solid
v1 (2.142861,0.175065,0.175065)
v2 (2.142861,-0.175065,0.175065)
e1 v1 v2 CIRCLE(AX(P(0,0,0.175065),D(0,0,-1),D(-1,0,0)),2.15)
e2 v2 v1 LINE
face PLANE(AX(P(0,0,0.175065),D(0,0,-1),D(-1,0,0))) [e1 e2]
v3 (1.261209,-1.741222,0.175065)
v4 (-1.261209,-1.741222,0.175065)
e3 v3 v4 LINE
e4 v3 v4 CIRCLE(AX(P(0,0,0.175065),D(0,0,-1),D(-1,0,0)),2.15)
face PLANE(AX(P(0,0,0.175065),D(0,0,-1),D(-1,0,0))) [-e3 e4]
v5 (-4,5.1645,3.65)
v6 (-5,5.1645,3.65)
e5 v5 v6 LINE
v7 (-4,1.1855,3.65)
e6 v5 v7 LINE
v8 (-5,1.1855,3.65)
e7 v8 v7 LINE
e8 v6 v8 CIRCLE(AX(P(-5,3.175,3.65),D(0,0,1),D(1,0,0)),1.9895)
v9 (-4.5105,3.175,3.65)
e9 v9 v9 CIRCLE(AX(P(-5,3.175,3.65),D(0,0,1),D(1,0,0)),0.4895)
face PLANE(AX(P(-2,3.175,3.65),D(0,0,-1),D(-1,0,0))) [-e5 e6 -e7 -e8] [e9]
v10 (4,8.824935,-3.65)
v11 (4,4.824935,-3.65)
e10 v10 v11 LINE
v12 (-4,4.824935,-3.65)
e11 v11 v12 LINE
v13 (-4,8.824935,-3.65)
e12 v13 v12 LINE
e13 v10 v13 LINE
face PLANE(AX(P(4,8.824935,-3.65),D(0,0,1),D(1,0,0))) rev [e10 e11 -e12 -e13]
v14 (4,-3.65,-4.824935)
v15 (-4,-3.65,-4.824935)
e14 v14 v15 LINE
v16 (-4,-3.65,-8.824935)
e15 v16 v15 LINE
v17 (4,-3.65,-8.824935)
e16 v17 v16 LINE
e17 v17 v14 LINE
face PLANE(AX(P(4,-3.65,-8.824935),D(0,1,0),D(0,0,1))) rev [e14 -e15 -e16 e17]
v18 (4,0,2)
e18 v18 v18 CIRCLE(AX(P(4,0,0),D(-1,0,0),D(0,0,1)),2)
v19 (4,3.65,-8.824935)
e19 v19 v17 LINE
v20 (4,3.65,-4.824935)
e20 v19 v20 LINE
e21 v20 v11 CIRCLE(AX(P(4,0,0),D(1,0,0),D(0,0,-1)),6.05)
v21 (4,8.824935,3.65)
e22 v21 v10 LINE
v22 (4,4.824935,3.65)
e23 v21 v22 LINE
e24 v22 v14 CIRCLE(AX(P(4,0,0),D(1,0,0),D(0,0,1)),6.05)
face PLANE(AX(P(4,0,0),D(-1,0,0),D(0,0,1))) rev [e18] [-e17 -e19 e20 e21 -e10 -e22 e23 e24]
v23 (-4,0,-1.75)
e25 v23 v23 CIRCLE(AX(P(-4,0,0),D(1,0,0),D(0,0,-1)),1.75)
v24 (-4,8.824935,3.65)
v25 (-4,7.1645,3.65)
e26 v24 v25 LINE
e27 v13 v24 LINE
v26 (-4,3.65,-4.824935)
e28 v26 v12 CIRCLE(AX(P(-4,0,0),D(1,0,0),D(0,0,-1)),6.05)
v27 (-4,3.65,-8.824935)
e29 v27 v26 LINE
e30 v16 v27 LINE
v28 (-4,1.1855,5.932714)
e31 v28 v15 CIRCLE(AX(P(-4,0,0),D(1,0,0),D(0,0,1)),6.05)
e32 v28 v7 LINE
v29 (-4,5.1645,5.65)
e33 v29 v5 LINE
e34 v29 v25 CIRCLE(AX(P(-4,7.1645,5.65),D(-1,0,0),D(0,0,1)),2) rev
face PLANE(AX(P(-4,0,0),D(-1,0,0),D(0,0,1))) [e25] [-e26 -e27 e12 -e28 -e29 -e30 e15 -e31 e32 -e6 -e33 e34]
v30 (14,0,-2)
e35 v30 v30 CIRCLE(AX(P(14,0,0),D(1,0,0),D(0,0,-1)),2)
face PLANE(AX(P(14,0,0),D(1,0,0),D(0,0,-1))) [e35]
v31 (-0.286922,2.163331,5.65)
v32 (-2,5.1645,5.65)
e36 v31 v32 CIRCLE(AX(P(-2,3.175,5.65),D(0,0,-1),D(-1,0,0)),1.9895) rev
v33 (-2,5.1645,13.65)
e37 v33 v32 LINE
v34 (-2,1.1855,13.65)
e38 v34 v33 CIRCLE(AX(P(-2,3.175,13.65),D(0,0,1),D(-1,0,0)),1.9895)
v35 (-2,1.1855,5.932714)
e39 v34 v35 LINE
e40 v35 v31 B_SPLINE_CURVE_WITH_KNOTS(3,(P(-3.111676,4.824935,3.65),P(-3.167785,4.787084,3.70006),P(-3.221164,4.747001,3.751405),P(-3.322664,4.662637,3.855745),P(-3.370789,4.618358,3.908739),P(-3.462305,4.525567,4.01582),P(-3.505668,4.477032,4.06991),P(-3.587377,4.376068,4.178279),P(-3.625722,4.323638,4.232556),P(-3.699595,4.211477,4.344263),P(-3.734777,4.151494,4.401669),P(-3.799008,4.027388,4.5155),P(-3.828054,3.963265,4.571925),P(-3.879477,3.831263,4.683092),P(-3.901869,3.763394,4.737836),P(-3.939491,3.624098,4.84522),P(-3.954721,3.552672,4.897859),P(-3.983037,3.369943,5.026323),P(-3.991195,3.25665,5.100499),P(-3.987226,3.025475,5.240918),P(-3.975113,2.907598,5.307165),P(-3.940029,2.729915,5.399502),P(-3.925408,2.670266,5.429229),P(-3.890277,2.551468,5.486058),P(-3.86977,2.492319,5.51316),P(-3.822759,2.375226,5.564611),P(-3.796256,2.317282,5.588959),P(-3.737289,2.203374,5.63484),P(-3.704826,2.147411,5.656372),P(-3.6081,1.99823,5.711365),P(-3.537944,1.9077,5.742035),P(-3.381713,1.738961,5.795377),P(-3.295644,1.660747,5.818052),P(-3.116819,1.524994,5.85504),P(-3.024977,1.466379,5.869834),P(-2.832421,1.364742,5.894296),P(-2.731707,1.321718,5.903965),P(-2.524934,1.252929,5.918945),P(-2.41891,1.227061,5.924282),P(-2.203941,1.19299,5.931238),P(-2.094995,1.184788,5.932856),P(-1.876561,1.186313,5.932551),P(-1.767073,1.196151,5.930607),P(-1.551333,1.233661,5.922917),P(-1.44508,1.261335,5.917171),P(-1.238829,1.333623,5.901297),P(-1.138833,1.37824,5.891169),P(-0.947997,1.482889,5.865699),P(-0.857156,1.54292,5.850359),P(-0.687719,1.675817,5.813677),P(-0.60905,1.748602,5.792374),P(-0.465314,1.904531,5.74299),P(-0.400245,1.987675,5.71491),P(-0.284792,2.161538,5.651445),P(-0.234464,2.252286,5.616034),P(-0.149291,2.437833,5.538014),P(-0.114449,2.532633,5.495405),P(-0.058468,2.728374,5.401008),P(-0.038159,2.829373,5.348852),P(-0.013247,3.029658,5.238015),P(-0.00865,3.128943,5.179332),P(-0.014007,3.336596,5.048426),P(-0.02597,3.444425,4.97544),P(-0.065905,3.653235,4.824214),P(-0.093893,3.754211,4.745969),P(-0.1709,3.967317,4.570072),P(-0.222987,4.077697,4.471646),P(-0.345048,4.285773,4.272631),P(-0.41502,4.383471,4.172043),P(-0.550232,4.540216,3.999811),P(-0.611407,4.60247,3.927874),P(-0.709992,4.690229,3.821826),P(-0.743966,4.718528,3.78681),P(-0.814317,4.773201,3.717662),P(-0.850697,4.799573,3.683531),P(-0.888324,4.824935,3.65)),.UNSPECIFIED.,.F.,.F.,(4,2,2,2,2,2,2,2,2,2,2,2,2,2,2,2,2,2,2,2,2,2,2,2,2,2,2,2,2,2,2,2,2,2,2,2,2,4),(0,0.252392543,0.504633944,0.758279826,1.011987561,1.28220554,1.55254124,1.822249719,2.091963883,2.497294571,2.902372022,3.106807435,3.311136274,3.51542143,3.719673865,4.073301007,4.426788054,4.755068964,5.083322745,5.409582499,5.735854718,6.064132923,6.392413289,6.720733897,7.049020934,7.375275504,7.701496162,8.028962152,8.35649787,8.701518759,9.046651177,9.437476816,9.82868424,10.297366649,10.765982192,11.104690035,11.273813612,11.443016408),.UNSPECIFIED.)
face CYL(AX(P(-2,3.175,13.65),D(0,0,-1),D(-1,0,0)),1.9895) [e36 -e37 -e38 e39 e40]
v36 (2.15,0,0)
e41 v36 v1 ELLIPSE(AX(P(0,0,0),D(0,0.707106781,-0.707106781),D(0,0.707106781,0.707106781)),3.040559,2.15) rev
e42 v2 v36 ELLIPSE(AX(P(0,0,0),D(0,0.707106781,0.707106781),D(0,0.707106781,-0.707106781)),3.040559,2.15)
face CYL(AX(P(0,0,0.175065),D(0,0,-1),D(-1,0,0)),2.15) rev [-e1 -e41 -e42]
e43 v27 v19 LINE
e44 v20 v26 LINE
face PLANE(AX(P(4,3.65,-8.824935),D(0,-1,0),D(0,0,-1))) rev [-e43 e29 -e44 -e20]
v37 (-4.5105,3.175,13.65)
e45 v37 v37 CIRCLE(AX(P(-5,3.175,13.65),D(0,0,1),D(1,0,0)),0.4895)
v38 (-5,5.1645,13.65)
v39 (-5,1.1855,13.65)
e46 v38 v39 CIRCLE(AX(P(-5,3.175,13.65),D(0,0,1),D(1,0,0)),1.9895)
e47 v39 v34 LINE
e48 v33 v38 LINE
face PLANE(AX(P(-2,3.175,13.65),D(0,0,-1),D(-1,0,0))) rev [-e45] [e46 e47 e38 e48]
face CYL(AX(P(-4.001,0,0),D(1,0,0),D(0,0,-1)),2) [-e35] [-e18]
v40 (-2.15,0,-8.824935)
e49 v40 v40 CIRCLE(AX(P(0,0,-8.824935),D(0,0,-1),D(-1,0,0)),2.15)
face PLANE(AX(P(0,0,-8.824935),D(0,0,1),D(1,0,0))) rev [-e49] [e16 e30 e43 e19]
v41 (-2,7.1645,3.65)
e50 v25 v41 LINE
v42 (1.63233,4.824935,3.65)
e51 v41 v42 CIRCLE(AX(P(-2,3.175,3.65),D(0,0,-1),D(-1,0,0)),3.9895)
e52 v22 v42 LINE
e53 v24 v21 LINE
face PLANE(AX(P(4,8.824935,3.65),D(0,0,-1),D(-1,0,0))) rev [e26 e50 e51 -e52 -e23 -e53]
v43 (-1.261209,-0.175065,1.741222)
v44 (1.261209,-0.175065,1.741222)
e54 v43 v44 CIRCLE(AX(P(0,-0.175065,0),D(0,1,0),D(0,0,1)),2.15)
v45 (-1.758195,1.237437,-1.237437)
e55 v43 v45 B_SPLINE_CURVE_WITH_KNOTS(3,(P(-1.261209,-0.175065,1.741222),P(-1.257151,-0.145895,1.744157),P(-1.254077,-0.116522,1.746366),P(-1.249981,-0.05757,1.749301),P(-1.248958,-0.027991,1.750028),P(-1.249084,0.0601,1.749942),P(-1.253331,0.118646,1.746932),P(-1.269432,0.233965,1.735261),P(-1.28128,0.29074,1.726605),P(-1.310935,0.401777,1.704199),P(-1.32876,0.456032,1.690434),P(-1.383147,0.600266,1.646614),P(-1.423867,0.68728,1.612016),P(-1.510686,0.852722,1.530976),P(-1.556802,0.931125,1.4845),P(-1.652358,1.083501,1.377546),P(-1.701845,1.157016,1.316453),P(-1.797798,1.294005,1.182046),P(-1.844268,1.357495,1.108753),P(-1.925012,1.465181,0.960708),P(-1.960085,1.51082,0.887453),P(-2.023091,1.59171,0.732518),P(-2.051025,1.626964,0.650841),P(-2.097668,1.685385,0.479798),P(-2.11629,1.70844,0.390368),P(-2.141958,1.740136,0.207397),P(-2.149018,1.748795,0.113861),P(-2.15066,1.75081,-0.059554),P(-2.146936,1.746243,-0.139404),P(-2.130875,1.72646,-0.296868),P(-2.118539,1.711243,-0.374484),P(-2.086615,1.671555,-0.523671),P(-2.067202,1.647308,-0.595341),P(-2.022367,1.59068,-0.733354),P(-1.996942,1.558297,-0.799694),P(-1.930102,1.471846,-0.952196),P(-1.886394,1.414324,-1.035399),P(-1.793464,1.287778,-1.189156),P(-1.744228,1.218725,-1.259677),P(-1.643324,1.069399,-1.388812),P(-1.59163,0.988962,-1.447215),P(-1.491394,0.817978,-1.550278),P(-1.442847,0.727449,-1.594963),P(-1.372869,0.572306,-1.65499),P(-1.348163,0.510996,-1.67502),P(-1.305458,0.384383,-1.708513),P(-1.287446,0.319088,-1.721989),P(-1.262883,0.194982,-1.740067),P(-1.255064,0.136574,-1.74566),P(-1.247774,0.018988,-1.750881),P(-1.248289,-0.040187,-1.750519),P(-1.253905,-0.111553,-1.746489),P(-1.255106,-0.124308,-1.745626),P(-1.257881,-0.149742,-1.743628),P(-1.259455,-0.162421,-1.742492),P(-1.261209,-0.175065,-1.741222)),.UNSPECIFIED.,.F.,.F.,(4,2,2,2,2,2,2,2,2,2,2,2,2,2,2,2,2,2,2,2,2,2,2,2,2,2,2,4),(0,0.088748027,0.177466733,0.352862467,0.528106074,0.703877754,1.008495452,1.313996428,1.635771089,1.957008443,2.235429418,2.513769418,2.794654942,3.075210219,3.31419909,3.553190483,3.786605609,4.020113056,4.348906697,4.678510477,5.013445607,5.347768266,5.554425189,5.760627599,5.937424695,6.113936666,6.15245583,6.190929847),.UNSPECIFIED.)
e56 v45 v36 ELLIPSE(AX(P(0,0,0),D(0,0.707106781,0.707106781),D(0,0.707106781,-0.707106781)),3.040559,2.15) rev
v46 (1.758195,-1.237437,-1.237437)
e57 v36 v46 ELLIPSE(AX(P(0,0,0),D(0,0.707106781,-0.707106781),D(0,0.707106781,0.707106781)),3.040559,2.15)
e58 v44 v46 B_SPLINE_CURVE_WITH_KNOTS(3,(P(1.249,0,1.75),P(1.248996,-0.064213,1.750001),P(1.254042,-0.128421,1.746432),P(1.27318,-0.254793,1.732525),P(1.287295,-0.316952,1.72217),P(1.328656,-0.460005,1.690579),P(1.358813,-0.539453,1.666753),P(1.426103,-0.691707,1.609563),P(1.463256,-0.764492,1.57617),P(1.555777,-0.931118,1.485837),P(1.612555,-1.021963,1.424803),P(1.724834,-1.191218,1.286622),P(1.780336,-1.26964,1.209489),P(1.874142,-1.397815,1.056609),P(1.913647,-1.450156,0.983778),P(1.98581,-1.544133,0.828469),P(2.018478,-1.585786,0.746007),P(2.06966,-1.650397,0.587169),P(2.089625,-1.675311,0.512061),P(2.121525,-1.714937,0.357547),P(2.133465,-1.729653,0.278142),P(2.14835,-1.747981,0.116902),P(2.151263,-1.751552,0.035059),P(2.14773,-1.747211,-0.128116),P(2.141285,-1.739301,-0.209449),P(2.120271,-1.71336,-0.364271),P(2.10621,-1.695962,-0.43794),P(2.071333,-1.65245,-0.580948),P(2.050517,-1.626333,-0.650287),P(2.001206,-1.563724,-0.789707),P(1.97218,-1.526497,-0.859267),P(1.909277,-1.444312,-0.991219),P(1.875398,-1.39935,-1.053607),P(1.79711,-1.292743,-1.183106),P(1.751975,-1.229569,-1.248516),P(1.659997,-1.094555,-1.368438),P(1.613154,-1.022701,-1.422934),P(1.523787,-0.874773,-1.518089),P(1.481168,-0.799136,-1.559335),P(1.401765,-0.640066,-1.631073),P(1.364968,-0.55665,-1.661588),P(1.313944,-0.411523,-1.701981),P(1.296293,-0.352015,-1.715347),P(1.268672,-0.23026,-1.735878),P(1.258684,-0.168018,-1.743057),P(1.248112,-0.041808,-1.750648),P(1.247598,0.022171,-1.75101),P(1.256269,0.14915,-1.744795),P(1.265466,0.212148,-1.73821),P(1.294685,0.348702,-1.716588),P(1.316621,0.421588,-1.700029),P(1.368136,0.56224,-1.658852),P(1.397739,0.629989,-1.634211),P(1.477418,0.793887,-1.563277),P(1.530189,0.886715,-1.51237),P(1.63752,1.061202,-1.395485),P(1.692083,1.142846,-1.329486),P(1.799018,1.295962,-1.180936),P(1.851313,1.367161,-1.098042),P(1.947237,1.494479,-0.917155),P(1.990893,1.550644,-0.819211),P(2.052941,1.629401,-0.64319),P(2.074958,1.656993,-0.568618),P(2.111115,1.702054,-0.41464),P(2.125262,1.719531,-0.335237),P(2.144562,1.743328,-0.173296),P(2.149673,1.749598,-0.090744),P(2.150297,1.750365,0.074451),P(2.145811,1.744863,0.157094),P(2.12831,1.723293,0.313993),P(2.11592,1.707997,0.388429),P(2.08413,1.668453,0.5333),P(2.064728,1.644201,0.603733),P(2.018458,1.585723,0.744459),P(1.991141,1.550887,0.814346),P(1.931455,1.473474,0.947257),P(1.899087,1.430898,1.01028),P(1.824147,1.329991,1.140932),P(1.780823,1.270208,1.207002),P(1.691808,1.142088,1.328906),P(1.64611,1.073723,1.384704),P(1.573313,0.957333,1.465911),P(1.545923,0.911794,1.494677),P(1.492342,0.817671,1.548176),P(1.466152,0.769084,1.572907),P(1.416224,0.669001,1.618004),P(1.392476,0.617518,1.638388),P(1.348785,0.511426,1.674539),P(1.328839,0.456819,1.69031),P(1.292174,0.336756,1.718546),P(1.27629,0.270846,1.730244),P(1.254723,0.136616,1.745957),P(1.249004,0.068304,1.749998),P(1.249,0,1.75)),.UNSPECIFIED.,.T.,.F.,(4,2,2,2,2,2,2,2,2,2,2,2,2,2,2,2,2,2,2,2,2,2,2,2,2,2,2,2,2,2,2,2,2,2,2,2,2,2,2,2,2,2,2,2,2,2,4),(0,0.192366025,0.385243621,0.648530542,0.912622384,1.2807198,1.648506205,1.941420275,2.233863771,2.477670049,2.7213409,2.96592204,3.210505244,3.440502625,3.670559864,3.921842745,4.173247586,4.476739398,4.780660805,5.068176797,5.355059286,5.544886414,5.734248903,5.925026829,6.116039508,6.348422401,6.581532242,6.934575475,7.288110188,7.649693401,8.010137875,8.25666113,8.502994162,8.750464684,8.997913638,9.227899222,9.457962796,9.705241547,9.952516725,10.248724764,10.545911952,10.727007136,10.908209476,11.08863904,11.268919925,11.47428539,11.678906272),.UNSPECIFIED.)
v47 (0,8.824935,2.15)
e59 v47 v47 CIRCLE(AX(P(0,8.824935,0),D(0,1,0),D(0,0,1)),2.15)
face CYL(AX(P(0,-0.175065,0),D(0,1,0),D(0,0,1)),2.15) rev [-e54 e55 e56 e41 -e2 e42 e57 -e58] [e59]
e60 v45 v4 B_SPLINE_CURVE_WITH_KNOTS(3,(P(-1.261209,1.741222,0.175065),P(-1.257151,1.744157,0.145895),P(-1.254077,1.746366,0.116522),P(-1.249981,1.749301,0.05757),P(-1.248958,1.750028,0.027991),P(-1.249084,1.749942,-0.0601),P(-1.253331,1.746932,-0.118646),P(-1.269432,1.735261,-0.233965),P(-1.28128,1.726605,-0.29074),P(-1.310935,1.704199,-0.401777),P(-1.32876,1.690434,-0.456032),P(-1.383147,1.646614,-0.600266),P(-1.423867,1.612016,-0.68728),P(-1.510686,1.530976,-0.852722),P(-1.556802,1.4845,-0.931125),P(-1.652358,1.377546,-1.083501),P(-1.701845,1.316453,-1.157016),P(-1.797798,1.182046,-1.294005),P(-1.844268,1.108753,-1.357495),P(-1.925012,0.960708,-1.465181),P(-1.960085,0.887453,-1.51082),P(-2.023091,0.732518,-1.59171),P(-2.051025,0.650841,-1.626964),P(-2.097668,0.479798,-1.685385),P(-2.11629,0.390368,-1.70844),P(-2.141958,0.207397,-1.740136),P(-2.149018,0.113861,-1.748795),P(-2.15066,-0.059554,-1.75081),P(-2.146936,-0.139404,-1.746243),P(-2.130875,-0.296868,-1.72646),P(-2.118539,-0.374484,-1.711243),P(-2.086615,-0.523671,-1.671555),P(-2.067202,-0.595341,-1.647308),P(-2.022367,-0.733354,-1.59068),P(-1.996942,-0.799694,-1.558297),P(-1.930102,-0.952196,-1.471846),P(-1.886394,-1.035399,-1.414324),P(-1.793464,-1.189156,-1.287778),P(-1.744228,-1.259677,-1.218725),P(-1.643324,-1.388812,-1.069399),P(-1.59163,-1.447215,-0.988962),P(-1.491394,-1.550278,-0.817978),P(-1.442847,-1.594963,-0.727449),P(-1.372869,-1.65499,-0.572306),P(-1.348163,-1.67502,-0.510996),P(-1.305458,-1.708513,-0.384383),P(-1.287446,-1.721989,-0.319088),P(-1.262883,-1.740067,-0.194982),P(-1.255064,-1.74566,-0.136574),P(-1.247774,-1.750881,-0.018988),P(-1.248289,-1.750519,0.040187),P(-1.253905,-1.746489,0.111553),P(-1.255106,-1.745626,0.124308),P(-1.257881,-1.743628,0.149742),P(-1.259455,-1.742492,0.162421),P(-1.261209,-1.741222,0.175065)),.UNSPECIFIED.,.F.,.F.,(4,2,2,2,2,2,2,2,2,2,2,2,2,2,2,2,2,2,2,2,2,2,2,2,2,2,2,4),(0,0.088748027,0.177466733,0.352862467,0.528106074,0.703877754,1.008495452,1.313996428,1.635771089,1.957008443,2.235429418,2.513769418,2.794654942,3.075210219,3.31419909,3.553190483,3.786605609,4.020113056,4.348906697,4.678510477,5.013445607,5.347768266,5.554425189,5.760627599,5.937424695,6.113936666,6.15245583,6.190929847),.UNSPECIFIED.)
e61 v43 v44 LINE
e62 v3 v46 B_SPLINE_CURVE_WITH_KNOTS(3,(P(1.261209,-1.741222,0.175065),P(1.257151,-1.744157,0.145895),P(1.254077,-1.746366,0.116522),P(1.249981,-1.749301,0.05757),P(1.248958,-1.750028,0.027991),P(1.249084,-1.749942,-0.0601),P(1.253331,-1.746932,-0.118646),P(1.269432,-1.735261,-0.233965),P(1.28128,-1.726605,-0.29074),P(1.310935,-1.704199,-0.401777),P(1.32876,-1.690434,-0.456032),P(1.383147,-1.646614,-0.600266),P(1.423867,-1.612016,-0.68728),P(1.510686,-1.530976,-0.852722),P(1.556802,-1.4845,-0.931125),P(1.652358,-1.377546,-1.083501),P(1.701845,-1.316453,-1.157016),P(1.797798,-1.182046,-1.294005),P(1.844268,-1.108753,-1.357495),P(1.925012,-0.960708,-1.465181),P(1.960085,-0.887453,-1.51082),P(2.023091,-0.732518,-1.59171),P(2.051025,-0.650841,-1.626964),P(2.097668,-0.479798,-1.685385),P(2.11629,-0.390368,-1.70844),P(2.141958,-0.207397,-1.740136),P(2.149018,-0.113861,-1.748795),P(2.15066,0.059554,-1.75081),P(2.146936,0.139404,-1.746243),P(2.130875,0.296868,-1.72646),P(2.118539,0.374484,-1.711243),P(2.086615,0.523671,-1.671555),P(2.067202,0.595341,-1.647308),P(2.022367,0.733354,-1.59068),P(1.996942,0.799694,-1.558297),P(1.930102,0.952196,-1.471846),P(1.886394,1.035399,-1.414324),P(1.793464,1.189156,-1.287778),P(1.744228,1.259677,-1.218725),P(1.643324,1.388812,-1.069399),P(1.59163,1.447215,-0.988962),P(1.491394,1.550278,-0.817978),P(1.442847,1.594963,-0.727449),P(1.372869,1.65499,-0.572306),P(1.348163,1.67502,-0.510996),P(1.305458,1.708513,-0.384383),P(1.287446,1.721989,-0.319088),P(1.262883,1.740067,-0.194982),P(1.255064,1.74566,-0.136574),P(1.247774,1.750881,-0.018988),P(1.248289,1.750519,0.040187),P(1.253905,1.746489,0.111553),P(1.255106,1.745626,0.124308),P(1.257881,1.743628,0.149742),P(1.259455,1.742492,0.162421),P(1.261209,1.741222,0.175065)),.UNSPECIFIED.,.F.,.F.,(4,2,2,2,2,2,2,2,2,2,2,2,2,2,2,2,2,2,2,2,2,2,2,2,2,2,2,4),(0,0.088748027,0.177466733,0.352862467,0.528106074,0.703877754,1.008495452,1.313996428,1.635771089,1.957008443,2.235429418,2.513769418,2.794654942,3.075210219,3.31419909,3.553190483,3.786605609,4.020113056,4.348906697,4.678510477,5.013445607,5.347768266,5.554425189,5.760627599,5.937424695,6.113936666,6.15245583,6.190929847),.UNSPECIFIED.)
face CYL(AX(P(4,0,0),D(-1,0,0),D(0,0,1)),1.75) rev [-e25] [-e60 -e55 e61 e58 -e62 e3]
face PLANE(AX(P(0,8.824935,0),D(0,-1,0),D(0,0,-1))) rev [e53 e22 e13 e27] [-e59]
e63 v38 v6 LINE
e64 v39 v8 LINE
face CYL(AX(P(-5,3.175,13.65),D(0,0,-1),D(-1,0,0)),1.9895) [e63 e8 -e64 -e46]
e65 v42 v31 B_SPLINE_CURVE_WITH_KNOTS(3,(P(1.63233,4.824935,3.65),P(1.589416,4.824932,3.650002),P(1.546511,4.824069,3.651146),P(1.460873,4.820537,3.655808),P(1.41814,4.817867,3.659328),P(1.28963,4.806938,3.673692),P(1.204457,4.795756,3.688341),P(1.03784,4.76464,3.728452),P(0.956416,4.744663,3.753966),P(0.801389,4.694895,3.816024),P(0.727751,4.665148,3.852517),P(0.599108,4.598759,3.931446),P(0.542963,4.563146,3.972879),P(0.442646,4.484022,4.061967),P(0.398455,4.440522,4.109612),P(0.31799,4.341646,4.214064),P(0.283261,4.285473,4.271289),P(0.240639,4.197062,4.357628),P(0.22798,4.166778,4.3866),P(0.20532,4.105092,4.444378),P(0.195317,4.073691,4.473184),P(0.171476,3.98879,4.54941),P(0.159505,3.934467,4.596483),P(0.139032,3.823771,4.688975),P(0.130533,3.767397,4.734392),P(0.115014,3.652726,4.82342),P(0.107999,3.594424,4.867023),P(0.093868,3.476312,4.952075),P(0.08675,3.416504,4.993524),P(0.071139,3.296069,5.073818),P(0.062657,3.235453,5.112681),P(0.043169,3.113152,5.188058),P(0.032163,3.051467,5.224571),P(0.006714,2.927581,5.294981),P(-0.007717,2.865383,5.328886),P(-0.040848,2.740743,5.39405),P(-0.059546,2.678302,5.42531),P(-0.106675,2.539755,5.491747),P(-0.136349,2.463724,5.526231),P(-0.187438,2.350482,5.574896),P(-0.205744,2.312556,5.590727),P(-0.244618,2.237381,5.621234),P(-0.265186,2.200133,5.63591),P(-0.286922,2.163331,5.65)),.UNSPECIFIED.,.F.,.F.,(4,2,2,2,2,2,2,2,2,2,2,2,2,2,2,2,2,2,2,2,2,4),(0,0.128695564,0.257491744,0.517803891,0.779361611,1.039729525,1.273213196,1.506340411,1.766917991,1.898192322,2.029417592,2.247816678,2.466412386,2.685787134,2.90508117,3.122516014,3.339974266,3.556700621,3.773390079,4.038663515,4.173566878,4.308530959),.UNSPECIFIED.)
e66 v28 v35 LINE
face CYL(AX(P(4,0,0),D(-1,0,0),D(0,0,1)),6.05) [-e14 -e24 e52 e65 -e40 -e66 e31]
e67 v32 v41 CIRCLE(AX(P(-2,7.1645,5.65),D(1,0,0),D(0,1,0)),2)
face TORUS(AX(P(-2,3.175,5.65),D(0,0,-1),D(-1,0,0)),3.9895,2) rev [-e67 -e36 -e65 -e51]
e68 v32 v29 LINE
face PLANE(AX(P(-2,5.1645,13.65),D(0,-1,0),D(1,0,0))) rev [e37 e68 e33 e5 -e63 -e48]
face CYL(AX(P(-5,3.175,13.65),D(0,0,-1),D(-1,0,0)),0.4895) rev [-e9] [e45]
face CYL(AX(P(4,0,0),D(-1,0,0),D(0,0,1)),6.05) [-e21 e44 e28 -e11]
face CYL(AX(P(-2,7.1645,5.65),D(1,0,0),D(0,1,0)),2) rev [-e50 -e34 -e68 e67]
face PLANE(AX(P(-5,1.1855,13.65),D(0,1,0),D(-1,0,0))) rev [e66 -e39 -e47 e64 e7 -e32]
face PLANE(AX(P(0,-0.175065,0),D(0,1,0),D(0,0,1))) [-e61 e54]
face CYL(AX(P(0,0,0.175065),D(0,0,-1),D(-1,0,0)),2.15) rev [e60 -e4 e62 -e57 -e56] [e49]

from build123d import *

# Parameters (mm, degrees)
SKETCH1_R               = 1.75
BOSS_EXTRUDE1_DEPTH     = 4
SKETCH2_R               = 2.15
CUT_EXTRUDE1_DEPTH      = 5
BOSS_EXTRUDE5_START     = -1.8499999
BOSS_EXTRUDE5_OUTLINE_R = 2
BOSS_EXTRUDE5_DEPTH     = 11.8499999
BOSS_EXTRUDE5_START_2   = -3
BOSS_EXTRUDE5_2_DEPTH   = 7.824935333
SKETCH3_R               = 2.15
CUT_EXTRUDE2_DEPTH      = 5
BOSS_EXTRUDE2_START     = 4
SKETCH4_W               = 8
SKETCH4_H               = 7.3
SKETCH4_R               = 2.15
BOSS_EXTRUDE2_DEPTH     = 4
BOSS_EXTRUDE3_START     = 4
SKETCH5_W               = 8
SKETCH5_H               = 7.3
SKETCH5_R               = 2.15
BOSS_EXTRUDE3_DEPTH     = 4
SKETCH6_R               = 0.4895
BOSS_EXTRUDE4_DEPTH     = 10
FILLET1_R               = 2


with BuildPart() as part:
    # Sketch1 → Boss-Extrude1 (new, symmetric)
    with BuildSketch(Plane(origin=(0, 0, 0), x_dir=(0, 0, -1), z_dir=(1, 0, 0))):
        with BuildLine():
            Line((-3.65, 4.824935233), (3.65, 4.824935233))
            ThreePointArc((3.65, 4.824935233), (4.277996026, 4.277996026), (4.824935233, 3.65))
            Line((4.824935233, 3.65), (4.824935233, -3.65))
            ThreePointArc((4.824935233, -3.65), (-4.277996026, -4.277996026), (-3.65, 4.824935233))
        make_face()
        Circle(SKETCH1_R, mode=Mode.SUBTRACT)
    extrude(amount=BOSS_EXTRUDE1_DEPTH, both=True)

    # Sketch2 → Cut-Extrude1 (cut)
    with BuildSketch(Plane(origin=(0, 4.824935233, 0), x_dir=(1, 0, 0), z_dir=(0, 1, 0))):
        with Locations(Location((0, 0, 0), (0, 0, 270))):
            Circle(SKETCH2_R)
    extrude(amount=-CUT_EXTRUDE1_DEPTH, mode=Mode.SUBTRACT)

    # Boss-Extrude5: read off the stored shape, not the designer's step
    # Boss-Extrude5 outline → Boss-Extrude5 (add)
    with BuildSketch(Plane(origin=(4, 0, 0), x_dir=(0, 0, -1), z_dir=(1, 0, 0)).offset(BOSS_EXTRUDE5_START)):
        Circle(BOSS_EXTRUDE5_OUTLINE_R)
    extrude(amount=BOSS_EXTRUDE5_DEPTH)

    # Boss-Extrude5 2 outline → Boss-Extrude5 2 (add)
    with BuildSketch(Plane(origin=(0, 0, 0), x_dir=(1, 0, 0), z_dir=(0, 1, 0)).offset(BOSS_EXTRUDE5_START_2)):
        with BuildLine():
            Line((2.1500001, -3), (2.15, 0))
            ThreePointArc((2.15, 0), (1.52027958, -1.52027958), (0, -2.15))
            Line((0, -2.15), (0, -3))
            Line((0, -3), (2.1500001, -3))
        make_face()
        with BuildLine():
            ThreePointArc((0, 2.15), (1.52027958, 1.52027958), (2.15, 0))
            Line((2.15, 0), (2.1500001, 3))
            Line((2.1500001, 3), (0, 3))
            Line((0, 3), (0, 2.15))
        make_face()
    extrude(amount=BOSS_EXTRUDE5_2_DEPTH)

    # Sketch3 → Cut-Extrude2 (cut)
    with BuildSketch(Plane(origin=(0, 0, -4.824935233), x_dir=(-1, 0, 0), z_dir=(0, 0, -1))):
        Circle(SKETCH3_R)
    extrude(amount=-CUT_EXTRUDE2_DEPTH, mode=Mode.SUBTRACT)

    # Sketch4 → Boss-Extrude2 (add)
    with BuildSketch(Plane(origin=(0, 4.824935233, 0), x_dir=(1, 0, 0), z_dir=(0, 1, 0)).offset(BOSS_EXTRUDE2_START)):
        Rectangle(SKETCH4_W, SKETCH4_H)
        with Locations(Location((0, 0, 0), (0, 0, 270))):
            Circle(SKETCH4_R, mode=Mode.SUBTRACT)
    extrude(amount=-BOSS_EXTRUDE2_DEPTH)

    # Sketch5 → Boss-Extrude3 (add)
    with BuildSketch(Plane(origin=(0, 0, -4.824935233), x_dir=(-1, 0, 0), z_dir=(0, 0, -1)).offset(BOSS_EXTRUDE3_START)):
        Rectangle(SKETCH5_W, SKETCH5_H)
        Circle(SKETCH5_R, mode=Mode.SUBTRACT)
    extrude(amount=-BOSS_EXTRUDE3_DEPTH)

    # Sketch6 → Boss-Extrude4 (add)
    with BuildSketch(Plane.XY.offset(3.65)):
        with BuildLine():
            Line((-2, 5.1645), (-5, 5.1645))
            ThreePointArc((-5, 5.1645), (-6.9895, 3.175), (-5, 1.1855))
            Line((-5, 1.1855), (-2, 1.1855))
            ThreePointArc((-2, 1.1855), (-0.0105, 3.175), (-2, 5.1645))
        make_face()
        with Locations((-5, 3.175)):
            Circle(SKETCH6_R, mode=Mode.SUBTRACT)
    extrude(amount=BOSS_EXTRUDE4_DEPTH)

    # Fillet1
    # the kernel refuses this fillet: 2 mm, written as the material it adds along each edge
    with BuildSketch(Plane(origin=(-2, 3.175, 3.65), x_dir=(0.03534330894551541, -0.9993752300876693, 0), z_dir=(-0.9993752300876693, -0.03534330894551541, 0))) as fillet1_piece_1:
        with BuildLine():
            CenterArc((1.9895 + FILLET1_R, FILLET1_R), FILLET1_R, 180, 90)
            Line((1.9895 + FILLET1_R, 0), (1.9895, 0))
            Line((1.9895, 0), (1.9895, FILLET1_R))
        make_face()
    revolve(axis=Axis((-2, 3.175, 3.65), (0, 0, 1)), revolution_arc=177.974555734)
    with BuildSketch(Plane(origin=(-2, 5.1645, 3.65), x_dir=(0, 0, 1), z_dir=(-1, 0, 0))) as fillet1_piece_2:
        with BuildLine():
            CenterArc((FILLET1_R, FILLET1_R), FILLET1_R, 180, 90)
            Line((0, FILLET1_R), (0, 0))
            Line((0, 0), (FILLET1_R, 0))
        make_face()
    extrude(amount=2)


solid = part.part
